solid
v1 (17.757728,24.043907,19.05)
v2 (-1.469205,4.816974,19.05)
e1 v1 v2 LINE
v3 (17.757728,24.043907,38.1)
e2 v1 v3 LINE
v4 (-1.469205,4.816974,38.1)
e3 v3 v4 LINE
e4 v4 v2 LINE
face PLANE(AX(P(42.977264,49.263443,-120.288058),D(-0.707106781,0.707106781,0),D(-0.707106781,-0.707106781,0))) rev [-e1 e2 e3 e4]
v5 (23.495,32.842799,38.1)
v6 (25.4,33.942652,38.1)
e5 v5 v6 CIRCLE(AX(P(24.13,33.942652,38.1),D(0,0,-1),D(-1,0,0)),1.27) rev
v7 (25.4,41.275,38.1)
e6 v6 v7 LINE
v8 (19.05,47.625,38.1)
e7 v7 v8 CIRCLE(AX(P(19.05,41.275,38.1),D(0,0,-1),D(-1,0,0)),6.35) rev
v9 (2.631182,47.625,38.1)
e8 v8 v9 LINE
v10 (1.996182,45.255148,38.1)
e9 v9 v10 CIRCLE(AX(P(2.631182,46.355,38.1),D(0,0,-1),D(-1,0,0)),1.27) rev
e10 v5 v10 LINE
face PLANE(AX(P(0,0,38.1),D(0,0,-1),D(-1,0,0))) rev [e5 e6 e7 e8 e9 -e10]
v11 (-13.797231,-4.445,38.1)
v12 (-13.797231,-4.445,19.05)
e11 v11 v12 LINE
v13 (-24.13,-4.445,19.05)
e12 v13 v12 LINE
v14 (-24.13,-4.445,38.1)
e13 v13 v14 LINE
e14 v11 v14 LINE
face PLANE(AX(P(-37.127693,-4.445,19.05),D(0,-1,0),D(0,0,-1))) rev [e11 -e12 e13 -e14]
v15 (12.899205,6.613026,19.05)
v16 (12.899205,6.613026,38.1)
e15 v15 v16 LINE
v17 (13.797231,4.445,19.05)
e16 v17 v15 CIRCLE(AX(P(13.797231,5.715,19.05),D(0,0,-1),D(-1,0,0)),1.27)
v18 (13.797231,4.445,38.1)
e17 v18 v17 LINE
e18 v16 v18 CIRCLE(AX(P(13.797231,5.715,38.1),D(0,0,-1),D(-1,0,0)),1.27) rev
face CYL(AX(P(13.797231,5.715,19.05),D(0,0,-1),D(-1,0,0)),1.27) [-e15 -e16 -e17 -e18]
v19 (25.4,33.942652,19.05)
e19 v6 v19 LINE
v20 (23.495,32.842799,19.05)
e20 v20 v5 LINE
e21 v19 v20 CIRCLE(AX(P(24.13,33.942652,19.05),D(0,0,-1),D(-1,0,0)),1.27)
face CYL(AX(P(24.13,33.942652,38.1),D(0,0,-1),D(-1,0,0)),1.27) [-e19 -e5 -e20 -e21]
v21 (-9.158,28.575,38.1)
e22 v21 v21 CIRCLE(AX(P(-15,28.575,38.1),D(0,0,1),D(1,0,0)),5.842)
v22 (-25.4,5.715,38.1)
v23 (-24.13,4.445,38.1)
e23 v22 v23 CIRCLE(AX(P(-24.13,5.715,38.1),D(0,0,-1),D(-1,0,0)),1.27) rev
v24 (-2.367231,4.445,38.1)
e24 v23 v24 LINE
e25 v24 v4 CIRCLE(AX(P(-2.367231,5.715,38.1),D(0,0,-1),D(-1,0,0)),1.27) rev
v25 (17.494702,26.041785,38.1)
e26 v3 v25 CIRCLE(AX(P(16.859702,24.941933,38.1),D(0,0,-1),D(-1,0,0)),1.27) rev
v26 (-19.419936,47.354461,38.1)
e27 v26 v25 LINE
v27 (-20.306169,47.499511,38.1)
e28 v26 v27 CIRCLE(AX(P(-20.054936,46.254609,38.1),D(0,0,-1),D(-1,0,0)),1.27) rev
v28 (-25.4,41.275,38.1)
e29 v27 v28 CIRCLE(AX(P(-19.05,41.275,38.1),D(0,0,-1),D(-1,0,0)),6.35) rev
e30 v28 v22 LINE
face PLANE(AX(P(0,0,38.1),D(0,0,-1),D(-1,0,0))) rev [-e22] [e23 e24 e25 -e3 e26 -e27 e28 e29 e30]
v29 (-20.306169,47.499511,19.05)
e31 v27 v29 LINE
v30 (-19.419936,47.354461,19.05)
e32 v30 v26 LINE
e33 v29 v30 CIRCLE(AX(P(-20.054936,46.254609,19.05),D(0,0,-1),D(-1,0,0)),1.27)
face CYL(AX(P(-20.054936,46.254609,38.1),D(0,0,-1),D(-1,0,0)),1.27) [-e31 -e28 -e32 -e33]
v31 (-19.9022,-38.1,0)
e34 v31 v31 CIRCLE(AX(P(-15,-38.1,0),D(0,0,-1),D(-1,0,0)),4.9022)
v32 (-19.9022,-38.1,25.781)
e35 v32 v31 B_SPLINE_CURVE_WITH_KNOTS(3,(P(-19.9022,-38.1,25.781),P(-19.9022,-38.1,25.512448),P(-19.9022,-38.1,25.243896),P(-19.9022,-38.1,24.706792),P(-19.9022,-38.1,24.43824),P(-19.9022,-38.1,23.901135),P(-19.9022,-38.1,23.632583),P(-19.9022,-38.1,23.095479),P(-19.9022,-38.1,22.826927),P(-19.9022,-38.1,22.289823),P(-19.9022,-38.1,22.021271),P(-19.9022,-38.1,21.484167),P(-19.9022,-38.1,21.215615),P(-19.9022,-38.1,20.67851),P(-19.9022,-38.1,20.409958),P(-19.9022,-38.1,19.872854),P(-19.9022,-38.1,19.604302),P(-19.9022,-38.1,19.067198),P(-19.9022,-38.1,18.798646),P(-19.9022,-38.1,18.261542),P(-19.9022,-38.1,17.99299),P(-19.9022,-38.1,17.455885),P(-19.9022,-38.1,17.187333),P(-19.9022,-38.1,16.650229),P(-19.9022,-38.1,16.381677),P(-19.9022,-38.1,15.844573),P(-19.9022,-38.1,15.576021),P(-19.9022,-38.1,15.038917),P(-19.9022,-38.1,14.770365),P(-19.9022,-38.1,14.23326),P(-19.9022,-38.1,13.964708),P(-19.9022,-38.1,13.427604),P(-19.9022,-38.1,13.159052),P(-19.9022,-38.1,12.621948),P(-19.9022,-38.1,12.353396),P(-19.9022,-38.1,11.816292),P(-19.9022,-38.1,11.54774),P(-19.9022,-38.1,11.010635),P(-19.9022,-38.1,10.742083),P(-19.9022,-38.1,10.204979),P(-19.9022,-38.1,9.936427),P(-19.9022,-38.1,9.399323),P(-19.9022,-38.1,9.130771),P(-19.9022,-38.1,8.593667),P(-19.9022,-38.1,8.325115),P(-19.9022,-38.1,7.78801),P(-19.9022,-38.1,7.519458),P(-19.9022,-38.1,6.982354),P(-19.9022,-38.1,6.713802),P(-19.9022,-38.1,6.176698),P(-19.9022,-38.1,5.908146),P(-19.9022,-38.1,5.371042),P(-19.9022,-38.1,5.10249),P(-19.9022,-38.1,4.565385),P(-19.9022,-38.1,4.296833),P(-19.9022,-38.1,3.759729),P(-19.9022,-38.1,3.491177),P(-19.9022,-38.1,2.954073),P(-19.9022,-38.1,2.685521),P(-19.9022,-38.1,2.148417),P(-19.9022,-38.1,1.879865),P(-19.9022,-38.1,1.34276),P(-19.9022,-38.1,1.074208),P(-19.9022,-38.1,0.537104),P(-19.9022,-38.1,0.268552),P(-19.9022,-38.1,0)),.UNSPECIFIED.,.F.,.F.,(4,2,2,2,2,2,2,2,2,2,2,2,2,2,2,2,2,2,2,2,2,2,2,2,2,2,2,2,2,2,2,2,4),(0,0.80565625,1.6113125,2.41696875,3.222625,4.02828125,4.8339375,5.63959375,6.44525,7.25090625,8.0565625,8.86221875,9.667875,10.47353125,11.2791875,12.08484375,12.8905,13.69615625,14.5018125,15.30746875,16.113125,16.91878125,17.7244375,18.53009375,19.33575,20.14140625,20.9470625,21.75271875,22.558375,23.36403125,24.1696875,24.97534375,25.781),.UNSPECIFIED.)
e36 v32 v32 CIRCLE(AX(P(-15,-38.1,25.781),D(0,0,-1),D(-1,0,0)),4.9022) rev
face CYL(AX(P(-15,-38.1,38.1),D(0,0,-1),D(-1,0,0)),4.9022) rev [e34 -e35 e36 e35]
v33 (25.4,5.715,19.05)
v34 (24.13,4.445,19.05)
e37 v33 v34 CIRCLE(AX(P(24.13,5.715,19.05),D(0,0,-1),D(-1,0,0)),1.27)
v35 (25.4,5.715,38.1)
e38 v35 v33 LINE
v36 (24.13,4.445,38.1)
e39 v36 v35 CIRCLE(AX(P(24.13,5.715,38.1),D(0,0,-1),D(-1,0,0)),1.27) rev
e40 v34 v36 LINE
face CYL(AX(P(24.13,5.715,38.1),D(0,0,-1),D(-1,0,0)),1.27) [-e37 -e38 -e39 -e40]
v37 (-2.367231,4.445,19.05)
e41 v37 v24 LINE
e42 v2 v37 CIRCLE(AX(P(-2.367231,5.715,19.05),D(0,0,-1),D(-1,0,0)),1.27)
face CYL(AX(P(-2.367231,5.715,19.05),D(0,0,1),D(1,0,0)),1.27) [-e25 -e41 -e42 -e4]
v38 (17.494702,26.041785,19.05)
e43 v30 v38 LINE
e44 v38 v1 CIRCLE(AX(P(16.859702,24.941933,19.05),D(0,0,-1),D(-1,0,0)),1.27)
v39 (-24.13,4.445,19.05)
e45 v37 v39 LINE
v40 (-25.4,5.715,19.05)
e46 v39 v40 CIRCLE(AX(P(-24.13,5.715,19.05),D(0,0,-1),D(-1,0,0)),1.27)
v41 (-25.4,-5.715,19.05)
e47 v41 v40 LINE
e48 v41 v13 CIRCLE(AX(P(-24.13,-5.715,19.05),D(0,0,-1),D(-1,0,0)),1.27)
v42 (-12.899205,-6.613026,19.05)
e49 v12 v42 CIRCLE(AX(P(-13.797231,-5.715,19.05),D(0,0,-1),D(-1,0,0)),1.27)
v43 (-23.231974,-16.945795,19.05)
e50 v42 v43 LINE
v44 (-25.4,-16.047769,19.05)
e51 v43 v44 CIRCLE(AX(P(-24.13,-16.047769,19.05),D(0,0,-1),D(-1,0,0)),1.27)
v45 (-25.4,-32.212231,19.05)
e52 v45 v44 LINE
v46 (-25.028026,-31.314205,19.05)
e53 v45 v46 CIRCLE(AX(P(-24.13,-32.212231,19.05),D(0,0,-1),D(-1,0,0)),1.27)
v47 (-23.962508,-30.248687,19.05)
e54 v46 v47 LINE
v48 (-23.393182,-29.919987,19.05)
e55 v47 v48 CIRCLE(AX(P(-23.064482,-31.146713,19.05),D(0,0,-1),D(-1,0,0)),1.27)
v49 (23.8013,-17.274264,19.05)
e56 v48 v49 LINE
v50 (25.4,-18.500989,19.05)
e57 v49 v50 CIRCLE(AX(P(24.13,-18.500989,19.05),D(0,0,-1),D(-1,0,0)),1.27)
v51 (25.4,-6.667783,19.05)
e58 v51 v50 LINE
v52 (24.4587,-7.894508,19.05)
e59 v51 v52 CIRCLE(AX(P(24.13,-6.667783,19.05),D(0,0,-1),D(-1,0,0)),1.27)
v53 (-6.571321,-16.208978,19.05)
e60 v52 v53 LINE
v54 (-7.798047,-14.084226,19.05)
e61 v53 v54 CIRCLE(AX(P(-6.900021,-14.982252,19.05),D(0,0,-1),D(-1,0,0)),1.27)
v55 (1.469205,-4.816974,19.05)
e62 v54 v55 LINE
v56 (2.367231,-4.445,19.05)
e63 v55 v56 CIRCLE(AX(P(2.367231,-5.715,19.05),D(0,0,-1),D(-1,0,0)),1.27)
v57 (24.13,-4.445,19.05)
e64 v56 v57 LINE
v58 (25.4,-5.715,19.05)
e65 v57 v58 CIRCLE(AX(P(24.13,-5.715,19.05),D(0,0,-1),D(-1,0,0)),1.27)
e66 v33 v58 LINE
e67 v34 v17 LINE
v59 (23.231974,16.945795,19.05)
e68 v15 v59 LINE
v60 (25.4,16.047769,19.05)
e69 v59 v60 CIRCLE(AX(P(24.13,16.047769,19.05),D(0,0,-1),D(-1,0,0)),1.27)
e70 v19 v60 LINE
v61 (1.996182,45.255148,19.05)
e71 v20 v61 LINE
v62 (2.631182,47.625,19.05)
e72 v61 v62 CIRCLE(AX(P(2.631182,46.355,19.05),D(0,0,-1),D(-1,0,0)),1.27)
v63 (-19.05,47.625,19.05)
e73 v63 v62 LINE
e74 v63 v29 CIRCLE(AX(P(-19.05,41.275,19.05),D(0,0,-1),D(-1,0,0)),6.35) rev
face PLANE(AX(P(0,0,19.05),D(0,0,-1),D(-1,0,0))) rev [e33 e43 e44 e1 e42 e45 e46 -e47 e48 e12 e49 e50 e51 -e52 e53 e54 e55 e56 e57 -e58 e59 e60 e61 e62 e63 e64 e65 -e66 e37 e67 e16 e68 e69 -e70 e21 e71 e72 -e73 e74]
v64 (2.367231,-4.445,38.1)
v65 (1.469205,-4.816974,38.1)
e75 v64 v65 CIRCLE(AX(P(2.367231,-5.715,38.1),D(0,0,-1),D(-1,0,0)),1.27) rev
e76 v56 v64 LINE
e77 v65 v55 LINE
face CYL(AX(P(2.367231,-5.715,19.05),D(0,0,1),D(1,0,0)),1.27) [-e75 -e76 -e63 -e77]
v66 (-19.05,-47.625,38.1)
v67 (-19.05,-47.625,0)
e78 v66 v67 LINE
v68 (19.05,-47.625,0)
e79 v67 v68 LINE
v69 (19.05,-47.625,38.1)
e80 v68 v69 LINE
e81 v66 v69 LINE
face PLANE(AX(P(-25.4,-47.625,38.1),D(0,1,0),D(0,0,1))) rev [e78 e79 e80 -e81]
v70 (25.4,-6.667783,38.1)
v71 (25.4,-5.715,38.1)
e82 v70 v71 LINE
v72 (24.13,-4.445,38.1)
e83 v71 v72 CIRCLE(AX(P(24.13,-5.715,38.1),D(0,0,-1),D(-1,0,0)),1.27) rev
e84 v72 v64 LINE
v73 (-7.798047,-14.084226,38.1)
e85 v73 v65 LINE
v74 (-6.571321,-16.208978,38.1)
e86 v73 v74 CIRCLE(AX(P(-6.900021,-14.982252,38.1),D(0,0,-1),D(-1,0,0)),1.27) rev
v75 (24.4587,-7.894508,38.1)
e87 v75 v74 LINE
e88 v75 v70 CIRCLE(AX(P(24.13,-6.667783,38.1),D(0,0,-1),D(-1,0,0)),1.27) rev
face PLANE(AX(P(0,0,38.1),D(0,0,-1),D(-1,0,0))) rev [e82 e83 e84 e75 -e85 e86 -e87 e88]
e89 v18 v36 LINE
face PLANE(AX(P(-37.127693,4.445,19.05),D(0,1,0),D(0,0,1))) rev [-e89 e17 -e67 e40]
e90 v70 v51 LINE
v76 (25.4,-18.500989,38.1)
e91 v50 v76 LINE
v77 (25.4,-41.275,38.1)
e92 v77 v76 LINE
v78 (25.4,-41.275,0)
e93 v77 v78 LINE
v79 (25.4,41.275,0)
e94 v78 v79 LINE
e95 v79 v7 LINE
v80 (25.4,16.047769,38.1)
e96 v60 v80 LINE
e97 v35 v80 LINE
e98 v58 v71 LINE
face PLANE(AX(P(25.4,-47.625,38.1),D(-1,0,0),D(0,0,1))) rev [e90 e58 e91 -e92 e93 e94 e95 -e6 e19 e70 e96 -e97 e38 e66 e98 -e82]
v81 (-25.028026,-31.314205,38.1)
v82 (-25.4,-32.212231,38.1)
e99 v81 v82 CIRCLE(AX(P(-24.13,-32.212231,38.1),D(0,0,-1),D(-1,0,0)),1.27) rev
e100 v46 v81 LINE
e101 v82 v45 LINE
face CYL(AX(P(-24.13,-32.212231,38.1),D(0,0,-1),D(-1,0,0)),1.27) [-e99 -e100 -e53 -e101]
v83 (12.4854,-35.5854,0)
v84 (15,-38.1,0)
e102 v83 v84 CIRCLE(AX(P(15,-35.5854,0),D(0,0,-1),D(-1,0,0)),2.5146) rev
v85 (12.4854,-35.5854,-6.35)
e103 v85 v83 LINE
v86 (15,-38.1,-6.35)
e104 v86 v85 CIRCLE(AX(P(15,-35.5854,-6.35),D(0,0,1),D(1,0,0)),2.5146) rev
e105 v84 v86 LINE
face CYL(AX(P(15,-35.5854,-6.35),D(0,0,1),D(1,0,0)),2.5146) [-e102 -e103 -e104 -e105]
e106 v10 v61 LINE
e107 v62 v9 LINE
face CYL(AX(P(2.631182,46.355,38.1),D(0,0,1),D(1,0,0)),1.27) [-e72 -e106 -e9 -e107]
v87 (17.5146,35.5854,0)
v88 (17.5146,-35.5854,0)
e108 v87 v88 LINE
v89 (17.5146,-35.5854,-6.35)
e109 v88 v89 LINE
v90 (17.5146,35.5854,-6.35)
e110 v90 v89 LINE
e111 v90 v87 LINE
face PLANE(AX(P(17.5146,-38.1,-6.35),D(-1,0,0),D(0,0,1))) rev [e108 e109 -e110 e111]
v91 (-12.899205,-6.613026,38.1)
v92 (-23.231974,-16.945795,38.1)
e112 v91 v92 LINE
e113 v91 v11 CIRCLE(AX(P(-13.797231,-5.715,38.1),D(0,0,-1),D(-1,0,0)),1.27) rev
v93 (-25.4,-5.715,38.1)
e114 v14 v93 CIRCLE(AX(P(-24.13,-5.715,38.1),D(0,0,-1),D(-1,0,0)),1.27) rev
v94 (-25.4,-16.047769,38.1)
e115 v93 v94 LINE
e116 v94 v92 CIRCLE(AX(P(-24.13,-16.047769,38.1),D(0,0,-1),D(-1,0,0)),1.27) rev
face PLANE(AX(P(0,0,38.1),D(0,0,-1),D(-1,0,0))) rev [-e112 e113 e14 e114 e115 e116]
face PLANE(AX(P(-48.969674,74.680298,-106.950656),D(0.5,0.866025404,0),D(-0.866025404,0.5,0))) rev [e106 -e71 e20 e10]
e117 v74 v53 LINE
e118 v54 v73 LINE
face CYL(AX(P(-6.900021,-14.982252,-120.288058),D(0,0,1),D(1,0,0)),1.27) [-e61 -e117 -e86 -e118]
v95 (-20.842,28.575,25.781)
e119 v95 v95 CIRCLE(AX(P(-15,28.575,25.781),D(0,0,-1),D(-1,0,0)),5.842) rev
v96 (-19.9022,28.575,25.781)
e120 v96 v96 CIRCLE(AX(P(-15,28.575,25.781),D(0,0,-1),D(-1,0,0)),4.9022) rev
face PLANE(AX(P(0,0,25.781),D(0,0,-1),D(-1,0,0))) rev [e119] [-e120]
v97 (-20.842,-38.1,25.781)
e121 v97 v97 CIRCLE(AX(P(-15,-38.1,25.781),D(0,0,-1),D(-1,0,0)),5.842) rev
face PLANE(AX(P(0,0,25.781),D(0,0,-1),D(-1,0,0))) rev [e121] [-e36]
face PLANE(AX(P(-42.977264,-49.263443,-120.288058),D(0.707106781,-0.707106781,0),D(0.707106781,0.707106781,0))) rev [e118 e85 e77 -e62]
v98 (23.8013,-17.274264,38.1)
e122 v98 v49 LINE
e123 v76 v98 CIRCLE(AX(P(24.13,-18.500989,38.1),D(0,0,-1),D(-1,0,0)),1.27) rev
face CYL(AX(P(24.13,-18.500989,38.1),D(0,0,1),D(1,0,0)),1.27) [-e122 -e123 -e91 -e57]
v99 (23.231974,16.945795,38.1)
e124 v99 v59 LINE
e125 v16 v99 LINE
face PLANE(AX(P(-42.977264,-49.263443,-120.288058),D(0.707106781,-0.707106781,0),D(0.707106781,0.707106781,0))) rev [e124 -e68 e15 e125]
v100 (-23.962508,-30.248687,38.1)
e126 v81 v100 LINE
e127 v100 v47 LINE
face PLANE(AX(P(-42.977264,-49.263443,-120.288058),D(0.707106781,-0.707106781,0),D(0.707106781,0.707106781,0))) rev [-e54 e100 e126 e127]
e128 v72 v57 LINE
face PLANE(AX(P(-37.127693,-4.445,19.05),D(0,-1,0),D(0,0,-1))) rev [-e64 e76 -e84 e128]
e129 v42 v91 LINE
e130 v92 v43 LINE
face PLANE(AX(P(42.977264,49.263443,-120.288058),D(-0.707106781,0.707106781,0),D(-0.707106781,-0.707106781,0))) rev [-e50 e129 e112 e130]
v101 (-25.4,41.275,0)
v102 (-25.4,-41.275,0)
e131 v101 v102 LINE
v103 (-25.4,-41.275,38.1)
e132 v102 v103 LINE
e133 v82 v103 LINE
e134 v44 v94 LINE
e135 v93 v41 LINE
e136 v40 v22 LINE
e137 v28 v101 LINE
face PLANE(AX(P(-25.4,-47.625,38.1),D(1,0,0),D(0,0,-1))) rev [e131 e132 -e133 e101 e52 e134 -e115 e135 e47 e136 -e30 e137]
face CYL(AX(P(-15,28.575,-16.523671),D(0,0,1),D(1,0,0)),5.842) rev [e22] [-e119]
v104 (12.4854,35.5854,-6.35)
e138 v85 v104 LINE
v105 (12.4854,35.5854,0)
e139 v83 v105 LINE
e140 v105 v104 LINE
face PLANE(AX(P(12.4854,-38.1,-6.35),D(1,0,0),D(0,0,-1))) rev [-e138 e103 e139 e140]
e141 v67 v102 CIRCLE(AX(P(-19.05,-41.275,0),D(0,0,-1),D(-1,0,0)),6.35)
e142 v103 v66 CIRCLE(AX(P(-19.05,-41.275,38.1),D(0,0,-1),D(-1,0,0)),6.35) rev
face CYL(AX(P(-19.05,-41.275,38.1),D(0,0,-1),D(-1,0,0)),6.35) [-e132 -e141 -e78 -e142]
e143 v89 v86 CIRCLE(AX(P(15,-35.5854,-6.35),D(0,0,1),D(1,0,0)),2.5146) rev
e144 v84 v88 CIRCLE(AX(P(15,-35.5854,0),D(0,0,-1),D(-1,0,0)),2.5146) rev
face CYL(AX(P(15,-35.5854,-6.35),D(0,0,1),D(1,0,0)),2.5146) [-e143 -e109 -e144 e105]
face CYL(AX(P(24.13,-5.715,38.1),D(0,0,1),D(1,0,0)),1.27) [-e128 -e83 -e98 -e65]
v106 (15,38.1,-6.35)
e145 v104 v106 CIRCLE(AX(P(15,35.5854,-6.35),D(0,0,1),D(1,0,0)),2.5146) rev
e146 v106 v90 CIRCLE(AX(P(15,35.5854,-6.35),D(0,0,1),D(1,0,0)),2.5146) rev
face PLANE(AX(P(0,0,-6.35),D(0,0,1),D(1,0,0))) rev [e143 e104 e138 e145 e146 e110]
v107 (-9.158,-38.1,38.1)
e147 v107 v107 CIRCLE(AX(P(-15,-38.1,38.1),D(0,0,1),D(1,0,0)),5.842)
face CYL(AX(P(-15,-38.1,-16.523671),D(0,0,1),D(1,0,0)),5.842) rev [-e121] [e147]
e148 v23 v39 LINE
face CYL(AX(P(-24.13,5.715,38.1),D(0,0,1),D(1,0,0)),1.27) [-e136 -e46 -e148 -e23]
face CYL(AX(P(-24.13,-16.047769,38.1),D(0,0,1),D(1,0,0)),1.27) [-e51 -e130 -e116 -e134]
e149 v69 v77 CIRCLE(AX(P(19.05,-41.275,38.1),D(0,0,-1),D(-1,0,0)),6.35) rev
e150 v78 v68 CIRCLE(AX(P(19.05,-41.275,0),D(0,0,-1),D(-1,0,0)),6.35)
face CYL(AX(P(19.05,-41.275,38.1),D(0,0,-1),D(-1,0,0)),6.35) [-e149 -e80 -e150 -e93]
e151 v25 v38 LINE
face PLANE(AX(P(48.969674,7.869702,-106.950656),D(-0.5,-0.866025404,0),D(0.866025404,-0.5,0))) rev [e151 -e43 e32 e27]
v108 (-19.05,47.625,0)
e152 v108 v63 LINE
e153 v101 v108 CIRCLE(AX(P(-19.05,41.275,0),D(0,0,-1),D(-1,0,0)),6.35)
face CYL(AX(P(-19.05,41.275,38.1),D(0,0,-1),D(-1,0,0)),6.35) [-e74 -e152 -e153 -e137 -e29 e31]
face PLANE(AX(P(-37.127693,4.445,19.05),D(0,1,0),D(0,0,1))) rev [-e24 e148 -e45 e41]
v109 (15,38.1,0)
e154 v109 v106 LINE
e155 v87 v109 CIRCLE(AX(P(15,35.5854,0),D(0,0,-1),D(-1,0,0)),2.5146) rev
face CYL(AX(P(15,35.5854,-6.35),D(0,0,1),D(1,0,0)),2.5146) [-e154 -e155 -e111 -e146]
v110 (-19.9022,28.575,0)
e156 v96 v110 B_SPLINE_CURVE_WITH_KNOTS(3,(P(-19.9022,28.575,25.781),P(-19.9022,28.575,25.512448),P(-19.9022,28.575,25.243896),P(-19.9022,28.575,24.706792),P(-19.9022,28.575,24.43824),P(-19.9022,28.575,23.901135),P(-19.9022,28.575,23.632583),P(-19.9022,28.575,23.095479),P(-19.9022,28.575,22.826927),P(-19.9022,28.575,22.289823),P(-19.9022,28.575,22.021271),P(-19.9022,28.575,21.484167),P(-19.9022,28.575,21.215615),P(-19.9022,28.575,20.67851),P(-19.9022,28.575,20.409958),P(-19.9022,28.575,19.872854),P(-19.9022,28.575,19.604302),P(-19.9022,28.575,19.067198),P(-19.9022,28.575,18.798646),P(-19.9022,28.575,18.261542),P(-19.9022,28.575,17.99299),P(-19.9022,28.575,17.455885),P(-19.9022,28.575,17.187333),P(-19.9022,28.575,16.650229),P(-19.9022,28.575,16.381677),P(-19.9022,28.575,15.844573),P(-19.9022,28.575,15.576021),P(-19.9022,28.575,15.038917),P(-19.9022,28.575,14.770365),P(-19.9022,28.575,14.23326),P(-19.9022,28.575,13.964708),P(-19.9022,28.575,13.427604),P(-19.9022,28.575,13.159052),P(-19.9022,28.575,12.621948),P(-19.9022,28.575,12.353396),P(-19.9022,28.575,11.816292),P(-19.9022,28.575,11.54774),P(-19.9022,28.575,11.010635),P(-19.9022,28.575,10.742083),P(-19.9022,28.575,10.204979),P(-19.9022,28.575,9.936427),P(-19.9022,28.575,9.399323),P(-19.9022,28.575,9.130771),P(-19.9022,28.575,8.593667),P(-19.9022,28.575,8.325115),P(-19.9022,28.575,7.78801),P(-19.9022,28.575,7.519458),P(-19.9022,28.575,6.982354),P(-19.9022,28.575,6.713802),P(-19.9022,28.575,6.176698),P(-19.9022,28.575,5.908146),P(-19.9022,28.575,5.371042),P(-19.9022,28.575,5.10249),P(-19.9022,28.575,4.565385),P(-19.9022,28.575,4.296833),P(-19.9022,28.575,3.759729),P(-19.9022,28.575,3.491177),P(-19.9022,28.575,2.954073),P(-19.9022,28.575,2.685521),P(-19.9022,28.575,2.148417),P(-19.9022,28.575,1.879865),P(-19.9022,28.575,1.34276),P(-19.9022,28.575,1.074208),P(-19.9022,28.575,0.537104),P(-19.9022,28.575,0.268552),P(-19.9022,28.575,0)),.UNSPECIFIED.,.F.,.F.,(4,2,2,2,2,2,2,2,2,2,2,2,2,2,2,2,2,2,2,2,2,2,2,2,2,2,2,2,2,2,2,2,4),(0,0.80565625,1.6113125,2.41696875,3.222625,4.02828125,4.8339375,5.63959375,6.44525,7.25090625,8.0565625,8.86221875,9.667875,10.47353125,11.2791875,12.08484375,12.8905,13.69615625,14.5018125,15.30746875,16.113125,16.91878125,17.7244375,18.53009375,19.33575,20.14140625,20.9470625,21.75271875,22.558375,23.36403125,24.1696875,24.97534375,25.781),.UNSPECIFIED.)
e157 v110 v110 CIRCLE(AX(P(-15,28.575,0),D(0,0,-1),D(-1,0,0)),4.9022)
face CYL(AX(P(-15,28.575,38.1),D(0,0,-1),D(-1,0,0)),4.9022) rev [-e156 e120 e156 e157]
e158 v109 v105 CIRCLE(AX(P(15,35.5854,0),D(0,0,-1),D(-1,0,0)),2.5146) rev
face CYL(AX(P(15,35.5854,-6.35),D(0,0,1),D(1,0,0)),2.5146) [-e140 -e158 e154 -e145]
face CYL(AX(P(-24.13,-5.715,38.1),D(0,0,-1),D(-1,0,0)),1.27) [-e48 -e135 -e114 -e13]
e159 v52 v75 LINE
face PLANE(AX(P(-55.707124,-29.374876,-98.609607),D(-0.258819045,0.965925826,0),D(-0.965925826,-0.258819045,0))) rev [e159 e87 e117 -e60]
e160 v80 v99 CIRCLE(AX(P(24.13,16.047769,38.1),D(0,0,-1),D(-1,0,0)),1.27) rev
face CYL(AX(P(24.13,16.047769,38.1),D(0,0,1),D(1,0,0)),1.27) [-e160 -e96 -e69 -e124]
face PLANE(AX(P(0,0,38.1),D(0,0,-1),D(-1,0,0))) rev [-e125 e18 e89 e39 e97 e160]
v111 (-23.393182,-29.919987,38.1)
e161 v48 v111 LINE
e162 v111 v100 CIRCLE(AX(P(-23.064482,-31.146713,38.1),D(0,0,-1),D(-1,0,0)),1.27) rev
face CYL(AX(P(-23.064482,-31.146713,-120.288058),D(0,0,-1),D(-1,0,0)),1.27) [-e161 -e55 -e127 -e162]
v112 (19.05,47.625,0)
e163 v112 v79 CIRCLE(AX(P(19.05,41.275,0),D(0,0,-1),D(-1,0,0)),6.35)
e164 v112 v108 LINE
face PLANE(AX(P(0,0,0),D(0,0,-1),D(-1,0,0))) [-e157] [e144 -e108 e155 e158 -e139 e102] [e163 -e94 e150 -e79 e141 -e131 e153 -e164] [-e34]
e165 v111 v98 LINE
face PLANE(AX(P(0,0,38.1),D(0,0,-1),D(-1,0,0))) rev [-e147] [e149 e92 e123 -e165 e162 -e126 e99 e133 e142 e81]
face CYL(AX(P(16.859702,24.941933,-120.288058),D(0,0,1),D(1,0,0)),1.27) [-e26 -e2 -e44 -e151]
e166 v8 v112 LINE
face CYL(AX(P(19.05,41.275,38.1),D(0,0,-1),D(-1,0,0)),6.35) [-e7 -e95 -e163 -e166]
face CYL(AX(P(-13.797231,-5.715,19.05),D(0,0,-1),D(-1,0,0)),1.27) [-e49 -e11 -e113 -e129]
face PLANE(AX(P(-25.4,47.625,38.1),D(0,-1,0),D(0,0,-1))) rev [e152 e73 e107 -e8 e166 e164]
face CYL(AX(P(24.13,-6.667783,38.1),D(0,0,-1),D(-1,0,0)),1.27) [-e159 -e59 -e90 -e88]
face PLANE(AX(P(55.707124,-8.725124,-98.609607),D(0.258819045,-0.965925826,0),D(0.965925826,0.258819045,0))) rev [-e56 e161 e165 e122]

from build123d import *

# Parameters (mm, degrees)
SKETCH1_W           = 50.8
SKETCH1_H           = 95.25
BOSS_EXTRUDE1_DEPTH = 38.1
SKETCH2_W           = 74.255386752
SKETCH2_H           = 8.89
F_0_DEG_SLOT_DEPTH  = 19.05
SKETCH3_W           = 5.0292
SKETCH3_H           = 76.2
BOSS_EXTRUDE2_DEPTH = 6.35
SKETCH4_R           = 4.9022
CUT_EXTRUDE2_DEPTH  = 67.067470248
SKETCH5_R           = 5.842
CUT_EXTRUDE3_DEPTH  = 12.319
F_45DEG_SLOT_DEPTH  = 19.05
F_30_DEG_SLOT_DEPTH = 19.05
FILLET2_R           = 6.35
F_15_DEG_SLOT_DEPTH = 19.05
FILLET4_R           = 2.5146
FILLET3_R           = 1.27


with BuildPart() as part:
    # Sketch1 → Boss-Extrude1 (new body)
    with BuildSketch(Plane.XY):
        Rectangle(SKETCH1_W, SKETCH1_H)
    extrude(amount=BOSS_EXTRUDE1_DEPTH)

    # Sketch2 → 0 deg slot (cut)
    with BuildSketch(Plane.XY.offset(38.1)):
        Rectangle(SKETCH2_W, SKETCH2_H)
    extrude(amount=-F_0_DEG_SLOT_DEPTH, mode=Mode.SUBTRACT)

    # Sketch3 → Boss-Extrude2 (add)
    with BuildSketch(Plane(origin=(0, 0, 0), x_dir=(-1, 0, 0), z_dir=(0, 0, -1))):
        with Locations((-15, 0)):
            Rectangle(SKETCH3_W, SKETCH3_H)
    extrude(amount=BOSS_EXTRUDE2_DEPTH)

    # Sketch4 → Cut-Extrude2 (cut, through all)
    with BuildSketch(Plane(origin=(0, 0, 0), x_dir=(-1, 0, 0), z_dir=(0, 0, -1))):
        with Locations((15, 28.575)):
            Circle(SKETCH4_R)
        with Locations((15, -38.1)):
            Circle(SKETCH4_R)
    extrude(amount=-CUT_EXTRUDE2_DEPTH, mode=Mode.SUBTRACT)

    # Sketch5 → Cut-Extrude3 (cut)
    with BuildSketch(Plane.XY.offset(38.1)):
        with Locations((-15, -38.1)):
            Circle(SKETCH5_R)
        with Locations((-15, 28.575)):
            Circle(SKETCH5_R)
    extrude(amount=-CUT_EXTRUDE3_DEPTH, mode=Mode.SUBTRACT)

    # Sketch6 → 45deg slot (cut)
    with BuildSketch(Plane.XY.offset(38.1)):
        Polygon((42.977263594, 49.263442879), (-49.263442879, -42.977263594), (-42.977263594, -49.263442879), (49.263442879, 42.977263594), align=None)
    extrude(amount=-F_45DEG_SLOT_DEPTH, mode=Mode.SUBTRACT)

    # Sketch7 → 30 deg slot (cut)
    with BuildSketch(Plane.XY.offset(38.1)):
        Polygon((48.969673612, 7.869701865), (-53.414673612, 66.981332296), (-48.969673612, 74.680298135), (53.414673612, 15.568667704), align=None)
    extrude(amount=-F_30_DEG_SLOT_DEPTH, mode=Mode.SUBTRACT)

    # Fillet2
    fillet2_edges = [part.edges().sort_by_distance(p)[0] for p in [
        (-25.4, -47.625, 19.05),
        (25.4, -47.625, 19.05),
        (25.4, 47.625, 19.05),
        (-25.4, 47.625, 19.05),
    ]]
    fillet(fillet2_edges, radius=FILLET2_R)

    # Sketch10 → 15 deg slot (cut)
    with BuildSketch(Plane.XY.offset(38.1)):
        Polygon((55.707123796, -8.725123788), (-53.406222485, -37.961956807), (-55.707123796, -29.374876212), (53.406222485, -0.138043193), align=None)
    extrude(amount=-F_15_DEG_SLOT_DEPTH, mode=Mode.SUBTRACT)

    # Fillet4
    fillet4_edges = [part.edges().sort_by_distance(p)[0] for p in [
        (12.4854, 38.1, -3.175),
        (17.5146, 38.1, -3.175),
        (17.5146, -38.1, -3.175),
        (12.4854, -38.1, -3.175),
    ]]
    fillet(fillet4_edges, radius=FILLET4_R - 0.0001)  # a hair under: the kernel refuses the full size

    # Fillet3
    fillet3_edges = [part.edges().sort_by_distance(p)[0] for p in [
        (18.928057645, 25.21423693, 28.575),
        (-2.108522628, 47.625, 28.575),
        (25.4, 31.742947056, 28.575),
        (-19.809556788, 47.579409051, 28.575),
        (-23.721882631, -30.008061916, 28.575),
        (-11.149524062, -17.435703346, 28.575),
        (25.4, -7.64228789, 28.575),
        (25.4, -16.845893134, 28.575),
        (25.4, -4.445, 28.575),
        (-25.4, -4.445, 28.575),
        (25.4, 4.445, 28.575),
        (-25.4, 4.445, 28.575),
        (10.731179285, 4.445, 28.575),
        (-1.841179285, 4.445, 28.575),
        (-25.4, -19.113820715, 28.575),
        (-10.731179285, -4.445, 28.575),
        (25.4, 19.113820715, 28.575),
        (-25.4, -31.686179285, 28.575),
        (1.841179285, -4.445, 28.575),
    ]]
    fillet(fillet3_edges, radius=FILLET3_R)


solid = part.part
